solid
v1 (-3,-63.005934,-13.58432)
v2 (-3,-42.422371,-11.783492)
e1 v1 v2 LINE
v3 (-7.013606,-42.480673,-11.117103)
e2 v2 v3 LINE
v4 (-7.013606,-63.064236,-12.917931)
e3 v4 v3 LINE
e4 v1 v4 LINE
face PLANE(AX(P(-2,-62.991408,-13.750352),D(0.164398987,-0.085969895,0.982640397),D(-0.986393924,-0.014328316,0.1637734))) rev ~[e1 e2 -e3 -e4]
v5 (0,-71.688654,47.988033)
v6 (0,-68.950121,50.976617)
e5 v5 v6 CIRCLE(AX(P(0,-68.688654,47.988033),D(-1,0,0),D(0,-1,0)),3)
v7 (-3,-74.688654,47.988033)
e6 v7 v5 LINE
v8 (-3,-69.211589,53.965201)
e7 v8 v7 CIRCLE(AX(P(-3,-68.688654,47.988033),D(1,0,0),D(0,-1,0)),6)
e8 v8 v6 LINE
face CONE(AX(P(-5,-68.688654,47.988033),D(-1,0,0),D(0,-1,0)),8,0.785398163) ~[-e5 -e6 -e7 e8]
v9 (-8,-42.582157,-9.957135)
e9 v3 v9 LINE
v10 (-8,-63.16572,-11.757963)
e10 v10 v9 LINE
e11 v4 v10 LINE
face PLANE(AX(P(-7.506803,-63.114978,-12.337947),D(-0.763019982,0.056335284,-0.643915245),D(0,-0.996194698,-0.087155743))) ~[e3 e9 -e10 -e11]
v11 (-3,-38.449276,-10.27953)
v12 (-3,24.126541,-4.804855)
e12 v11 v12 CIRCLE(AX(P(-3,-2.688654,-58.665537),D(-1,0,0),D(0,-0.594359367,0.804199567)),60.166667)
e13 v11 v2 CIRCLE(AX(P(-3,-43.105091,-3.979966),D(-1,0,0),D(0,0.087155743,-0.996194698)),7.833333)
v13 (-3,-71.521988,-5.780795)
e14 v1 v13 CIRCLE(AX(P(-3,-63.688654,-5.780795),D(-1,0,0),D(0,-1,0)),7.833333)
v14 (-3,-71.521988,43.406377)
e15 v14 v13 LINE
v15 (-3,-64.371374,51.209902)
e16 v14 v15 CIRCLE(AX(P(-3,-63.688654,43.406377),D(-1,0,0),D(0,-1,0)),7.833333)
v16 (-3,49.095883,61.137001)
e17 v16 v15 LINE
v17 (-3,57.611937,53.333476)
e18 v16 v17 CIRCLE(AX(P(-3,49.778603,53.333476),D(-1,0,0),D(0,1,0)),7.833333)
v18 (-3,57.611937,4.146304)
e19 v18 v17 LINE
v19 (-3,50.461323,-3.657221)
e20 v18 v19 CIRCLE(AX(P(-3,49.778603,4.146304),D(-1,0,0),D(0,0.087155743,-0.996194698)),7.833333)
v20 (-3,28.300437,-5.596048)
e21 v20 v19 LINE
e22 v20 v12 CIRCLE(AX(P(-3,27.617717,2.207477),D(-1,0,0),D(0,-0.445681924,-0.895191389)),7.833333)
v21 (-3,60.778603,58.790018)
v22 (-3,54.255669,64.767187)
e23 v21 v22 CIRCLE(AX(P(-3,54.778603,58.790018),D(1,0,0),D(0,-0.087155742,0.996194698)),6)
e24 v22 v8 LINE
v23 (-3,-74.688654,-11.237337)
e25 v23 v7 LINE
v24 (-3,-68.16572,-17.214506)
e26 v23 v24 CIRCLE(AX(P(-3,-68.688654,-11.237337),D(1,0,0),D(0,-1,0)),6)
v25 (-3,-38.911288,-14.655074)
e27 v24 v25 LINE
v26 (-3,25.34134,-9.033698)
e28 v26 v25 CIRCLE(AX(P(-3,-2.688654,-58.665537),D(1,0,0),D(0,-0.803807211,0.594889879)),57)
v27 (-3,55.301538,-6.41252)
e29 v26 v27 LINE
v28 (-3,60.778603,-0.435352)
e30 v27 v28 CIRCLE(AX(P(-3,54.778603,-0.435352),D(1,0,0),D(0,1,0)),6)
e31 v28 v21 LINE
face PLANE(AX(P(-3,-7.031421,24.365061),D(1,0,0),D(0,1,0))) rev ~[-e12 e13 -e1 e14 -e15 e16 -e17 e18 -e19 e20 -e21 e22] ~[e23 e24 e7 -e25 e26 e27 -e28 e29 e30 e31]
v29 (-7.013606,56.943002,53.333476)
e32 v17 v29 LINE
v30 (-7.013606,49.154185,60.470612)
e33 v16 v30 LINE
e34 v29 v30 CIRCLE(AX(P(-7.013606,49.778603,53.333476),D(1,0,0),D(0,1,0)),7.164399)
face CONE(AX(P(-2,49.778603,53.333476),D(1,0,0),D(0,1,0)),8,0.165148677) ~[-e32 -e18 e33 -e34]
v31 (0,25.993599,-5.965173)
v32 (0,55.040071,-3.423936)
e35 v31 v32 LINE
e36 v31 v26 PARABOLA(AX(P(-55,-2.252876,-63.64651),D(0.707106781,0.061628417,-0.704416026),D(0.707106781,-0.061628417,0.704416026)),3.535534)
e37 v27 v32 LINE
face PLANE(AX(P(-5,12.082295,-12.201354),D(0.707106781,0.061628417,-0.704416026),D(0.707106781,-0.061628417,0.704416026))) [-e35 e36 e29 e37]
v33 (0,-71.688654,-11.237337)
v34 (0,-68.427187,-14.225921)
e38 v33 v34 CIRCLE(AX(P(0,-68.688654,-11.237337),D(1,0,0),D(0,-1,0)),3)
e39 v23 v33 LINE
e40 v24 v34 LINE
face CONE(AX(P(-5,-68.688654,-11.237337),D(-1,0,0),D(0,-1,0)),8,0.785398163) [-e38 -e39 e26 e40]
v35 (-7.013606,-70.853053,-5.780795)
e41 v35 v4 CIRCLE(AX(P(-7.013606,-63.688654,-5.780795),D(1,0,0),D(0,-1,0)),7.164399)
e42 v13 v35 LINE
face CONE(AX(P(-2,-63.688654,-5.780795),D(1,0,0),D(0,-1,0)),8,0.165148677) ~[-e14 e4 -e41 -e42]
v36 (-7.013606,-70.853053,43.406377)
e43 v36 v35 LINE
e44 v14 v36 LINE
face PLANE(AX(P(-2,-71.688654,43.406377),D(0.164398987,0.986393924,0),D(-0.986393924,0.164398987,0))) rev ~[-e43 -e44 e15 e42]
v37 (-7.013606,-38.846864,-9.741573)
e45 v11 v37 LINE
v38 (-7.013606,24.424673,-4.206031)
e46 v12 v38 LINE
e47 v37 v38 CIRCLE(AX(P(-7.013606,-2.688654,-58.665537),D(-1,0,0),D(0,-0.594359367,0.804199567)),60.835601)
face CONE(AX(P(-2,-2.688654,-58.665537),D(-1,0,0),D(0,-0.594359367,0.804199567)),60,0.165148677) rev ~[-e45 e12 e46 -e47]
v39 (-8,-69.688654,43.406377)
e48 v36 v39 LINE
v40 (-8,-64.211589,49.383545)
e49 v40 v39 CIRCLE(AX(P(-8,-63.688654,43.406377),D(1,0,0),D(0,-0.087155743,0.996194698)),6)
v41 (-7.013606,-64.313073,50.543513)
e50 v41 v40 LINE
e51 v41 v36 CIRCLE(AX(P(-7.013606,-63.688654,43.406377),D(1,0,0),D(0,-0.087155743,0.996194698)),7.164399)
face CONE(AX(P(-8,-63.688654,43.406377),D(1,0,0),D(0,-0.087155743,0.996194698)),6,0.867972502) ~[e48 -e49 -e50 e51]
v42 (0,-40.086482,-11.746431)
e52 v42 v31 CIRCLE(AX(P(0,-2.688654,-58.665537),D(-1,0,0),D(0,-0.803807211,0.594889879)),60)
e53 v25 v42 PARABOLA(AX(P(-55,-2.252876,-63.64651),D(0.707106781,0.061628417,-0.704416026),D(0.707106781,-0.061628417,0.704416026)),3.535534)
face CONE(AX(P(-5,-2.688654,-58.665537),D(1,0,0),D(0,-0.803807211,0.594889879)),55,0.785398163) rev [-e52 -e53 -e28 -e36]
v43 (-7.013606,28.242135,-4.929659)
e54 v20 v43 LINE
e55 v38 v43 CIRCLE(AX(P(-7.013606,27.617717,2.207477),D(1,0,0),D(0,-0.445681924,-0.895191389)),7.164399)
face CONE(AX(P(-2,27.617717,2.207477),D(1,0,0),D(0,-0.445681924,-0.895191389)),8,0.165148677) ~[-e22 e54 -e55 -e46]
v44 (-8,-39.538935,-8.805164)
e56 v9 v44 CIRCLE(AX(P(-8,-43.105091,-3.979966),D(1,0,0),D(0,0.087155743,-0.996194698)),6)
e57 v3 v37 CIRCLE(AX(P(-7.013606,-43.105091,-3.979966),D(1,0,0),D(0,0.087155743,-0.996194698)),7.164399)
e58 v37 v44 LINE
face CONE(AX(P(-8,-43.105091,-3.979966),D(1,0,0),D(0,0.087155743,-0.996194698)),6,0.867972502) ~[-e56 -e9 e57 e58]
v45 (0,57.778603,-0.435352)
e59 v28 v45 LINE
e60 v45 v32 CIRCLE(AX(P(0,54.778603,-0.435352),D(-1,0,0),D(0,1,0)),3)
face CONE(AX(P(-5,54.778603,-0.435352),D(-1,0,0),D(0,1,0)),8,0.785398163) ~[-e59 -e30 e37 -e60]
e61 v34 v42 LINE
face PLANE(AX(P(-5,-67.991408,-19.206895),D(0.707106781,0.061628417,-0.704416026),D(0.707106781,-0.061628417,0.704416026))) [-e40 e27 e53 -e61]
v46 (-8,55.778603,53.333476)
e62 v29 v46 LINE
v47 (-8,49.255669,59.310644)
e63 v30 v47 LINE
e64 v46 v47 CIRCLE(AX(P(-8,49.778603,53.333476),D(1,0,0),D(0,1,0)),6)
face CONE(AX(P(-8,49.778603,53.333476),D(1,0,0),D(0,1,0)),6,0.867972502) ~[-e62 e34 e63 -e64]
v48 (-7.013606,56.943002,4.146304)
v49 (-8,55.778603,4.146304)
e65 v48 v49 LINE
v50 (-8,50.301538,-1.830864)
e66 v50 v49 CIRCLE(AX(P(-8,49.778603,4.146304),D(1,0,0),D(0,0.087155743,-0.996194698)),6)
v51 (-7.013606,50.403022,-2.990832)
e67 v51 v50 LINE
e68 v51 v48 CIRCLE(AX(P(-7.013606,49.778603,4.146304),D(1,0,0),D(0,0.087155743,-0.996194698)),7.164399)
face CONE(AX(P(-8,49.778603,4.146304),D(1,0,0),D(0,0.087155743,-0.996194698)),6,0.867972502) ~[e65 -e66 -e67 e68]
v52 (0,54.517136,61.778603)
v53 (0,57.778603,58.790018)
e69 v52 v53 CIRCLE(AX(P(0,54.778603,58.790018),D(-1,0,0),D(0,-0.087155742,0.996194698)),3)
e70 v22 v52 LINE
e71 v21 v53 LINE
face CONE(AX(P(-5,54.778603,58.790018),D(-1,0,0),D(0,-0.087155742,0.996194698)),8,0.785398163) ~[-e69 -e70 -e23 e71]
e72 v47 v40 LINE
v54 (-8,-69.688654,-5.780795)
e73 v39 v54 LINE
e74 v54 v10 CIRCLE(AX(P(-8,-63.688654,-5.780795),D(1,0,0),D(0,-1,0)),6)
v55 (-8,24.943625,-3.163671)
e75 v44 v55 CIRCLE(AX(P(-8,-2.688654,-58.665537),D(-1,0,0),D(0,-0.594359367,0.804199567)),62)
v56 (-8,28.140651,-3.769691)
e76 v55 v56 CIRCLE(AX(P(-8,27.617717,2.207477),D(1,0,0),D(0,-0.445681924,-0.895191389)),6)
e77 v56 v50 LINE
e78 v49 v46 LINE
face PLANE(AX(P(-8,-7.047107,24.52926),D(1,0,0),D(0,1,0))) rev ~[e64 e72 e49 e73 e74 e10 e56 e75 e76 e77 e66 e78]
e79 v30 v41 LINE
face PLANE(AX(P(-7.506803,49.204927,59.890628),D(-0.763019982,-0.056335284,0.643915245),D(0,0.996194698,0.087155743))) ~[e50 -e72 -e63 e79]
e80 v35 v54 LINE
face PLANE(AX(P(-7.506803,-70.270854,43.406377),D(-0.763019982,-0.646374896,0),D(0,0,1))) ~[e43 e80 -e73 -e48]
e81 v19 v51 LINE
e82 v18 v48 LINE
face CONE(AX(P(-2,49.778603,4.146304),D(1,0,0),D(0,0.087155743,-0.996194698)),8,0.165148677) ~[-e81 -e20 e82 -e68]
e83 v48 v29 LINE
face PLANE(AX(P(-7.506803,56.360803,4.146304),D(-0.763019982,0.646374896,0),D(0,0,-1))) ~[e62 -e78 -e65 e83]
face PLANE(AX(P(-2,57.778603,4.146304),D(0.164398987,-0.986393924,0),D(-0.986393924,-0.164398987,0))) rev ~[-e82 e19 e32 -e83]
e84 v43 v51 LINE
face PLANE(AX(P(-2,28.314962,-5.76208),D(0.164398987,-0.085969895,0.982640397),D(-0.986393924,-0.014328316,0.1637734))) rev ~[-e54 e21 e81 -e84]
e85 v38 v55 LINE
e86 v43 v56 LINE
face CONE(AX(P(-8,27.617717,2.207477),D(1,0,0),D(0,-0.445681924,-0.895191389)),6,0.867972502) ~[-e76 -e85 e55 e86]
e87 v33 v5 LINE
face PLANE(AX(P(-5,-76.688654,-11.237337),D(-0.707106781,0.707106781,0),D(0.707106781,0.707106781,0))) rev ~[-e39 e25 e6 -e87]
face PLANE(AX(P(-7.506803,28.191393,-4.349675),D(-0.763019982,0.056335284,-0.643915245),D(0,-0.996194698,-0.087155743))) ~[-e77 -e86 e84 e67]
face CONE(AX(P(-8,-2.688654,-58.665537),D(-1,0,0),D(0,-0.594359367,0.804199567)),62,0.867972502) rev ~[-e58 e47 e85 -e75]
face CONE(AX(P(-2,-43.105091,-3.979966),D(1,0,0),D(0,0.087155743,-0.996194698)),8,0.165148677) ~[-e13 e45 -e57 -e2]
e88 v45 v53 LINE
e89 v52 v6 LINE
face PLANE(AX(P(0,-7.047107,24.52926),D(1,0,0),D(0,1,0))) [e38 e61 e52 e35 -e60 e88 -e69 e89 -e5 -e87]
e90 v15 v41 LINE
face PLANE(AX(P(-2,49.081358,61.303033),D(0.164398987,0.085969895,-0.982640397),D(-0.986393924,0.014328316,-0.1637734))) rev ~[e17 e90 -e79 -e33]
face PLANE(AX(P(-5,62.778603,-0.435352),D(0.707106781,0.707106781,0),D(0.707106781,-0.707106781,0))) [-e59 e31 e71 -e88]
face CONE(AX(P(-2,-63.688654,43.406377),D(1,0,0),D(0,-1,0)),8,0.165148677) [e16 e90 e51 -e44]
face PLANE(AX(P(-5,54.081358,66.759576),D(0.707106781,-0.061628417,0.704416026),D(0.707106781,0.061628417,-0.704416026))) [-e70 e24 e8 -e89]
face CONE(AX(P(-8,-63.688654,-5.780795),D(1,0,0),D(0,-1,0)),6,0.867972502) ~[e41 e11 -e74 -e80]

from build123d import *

# Parameters (mm, degrees)
F1_DEPTH     = 3
F2_DEPTH     = 8
F3_R         = 8
F4_T4_DEPTH  = 113.9006842239
F4_T9_ANGLE  = 95
F4_T14_ANGLE = 85
F4_T19_DEPTH = 49.1871720396
F4_T24_ANGLE = 95
F4_T29_DEPTH = 20.662188907
F4_T34_ANGLE = 31.4669762933
F4_T39_ANGLE = 62.9339525865
F4_T44_ANGLE = 31.4669762933
F4_T49_DEPTH = 22.2455379196
F4_T54_ANGLE = 85
F4_T59_DEPTH = 49.1871720396
F5_SIZE      = 1
F6_T1_DEPTH  = 123.9388825993
F6_T3_DEPTH  = 59.2253704151
F6_T5_DEPTH  = 42.8508484491
F6_T7_DEPTH  = 59.2253704151
F6_T9_DEPTH  = 43.5593108265
F6_T12_ANGLE = 96.9904356043
F6_T14_ANGLE = 95
F6_T16_ANGLE = 85
F6_T18_ANGLE = 95
F6_T20_ANGLE = 85


# Not quite as in the source:
# - a fillet or chamfer that OpenCascade refuses, or shapes differently, is made with other operations: its cross-section is extruded or revolved along the edge and cut away or added


with BuildPart() as f1:
    # F0 (on Right) → F1 (new body)
    with BuildSketch(Plane.YZ):
        with BuildLine():
            Line((-76.6886542646, 55.3186824411), (-76.6886542646, -19.9678053747))
            Line((-76.6886542646, -19.9678053747), (-38.1131050777, -16.5928821315))
            ThreePointArc((-38.1131050777, -16.5928821315), (-7.4822201157, -3.8748285682), (24.8917797013, -11.0806689666))
            Line((24.8917797013, -11.0806689666), (62.7786034683, -7.76600139))
            Line((62.7786034683, -7.76600139), (62.7786034683, 67.5204864257))
            Line((62.7786034683, 67.5204864257), (-76.6886542646, 55.3186824411))
        make_face()
        with BuildLine():
            Line((-40.0864817191, -11.7464310288), (-71.6886542646, -14.5112628693))
            Line((-71.6886542646, -14.5112628693), (-71.6886542646, 50.737026571))
            Line((-71.6886542646, 50.737026571), (57.7786034683, 62.0639439204))
            Line((57.7786034683, 62.0639439204), (57.7786034683, -3.1843455199))
            Line((57.7786034683, -3.1843455199), (25.9935989152, -5.9651730884))
            ThreePointArc((25.9935989152, -5.9651730884), (-7.9179988294, 1.1061449223), (-40.0864817191, -11.7464310288))
        make_face(mode=Mode.SUBTRACT)
        with BuildLine():
            Line((-71.6886542646, 50.737026571), (-71.6886542646, -14.5112628693))
            Line((-71.6886542646, -14.5112628693), (-40.0864817191, -11.7464310288))
            ThreePointArc((-40.0864817191, -11.7464310288), (-7.9179988294, 1.1061449223), (25.9935989152, -5.9651730884))
            Line((25.9935989152, -5.9651730884), (57.7786034683, -3.1843455199))
            Line((57.7786034683, -3.1843455199), (57.7786034683, 62.0639439204))
            Line((57.7786034683, 62.0639439204), (-71.6886542646, 50.737026571))
        make_face()
    extrude(amount=-F1_DEPTH)

    # F0 (on Right) → F2 (join)
    with BuildSketch(Plane.YZ):
        with BuildLine():
            Line((-71.6886542646, 50.737026571), (-71.6886542646, -14.5112628693))
            Line((-71.6886542646, -14.5112628693), (-40.0864817191, -11.7464310288))
            ThreePointArc((-40.0864817191, -11.7464310288), (-7.9179988294, 1.1061449223), (25.9935989152, -5.9651730884))
            Line((25.9935989152, -5.9651730884), (57.7786034683, -3.1843455199))
            Line((57.7786034683, -3.1843455199), (57.7786034683, 62.0639439204))
            Line((57.7786034683, 62.0639439204), (-71.6886542646, 50.737026571))
        make_face()
    extrude(amount=-F2_DEPTH)

    # F3
    f3_edges = [f1.edges().sort_by_distance(p)[0] for p in [
        (-5.5, 57.778603, 62.063944),
        (-5.5, -71.688654, 50.737027),
        (-5.5, -71.688654, -14.511263),
        (-5.5, -40.086482, -11.746431),
        (-5.5, 25.993599, -5.965173),
        (-5.5, 57.778603, -3.184346),
        (-1.5, -76.688654, 55.318682),
        (-1.5, -76.688654, -19.967805),
        (-1.5, 62.778603, -7.766001),
        (-1.5, 62.778603, 67.520486),
    ]]
    fillet(f3_edges, radius=F3_R)

    # F4: chamfer of 1 x 6 on 1 edges, made by hand


with BuildPart() as f4_tool2:
    # F4_s3 → F4_t4 (new body)
    with BuildSketch(Plane(origin=(0, 54.0311094993, 4.7271095589), x_dir=(1, 0, 0), z_dir=(0, -0.9961946981, -0.0871557427))):
        Polygon((-2, 56.792034776), (-8, 55.792034776), (-8, 56.792034776), align=None)
    extrude(amount=F4_T4_DEPTH)

    split(bisect_by=Plane.YZ.offset(-3), keep=Keep.BOTTOM)


with BuildPart() as f1_1:
    add(f1.part)

    # F4_t1: cut F4_tool2
    add(f4_tool2.part, mode=Mode.SUBTRACT)


with BuildPart() as f4_tool7:
    # F4_s8 → F4_t9 (revolve)
    with BuildSketch(Plane.XY.offset(53.3334759118)):
        Polygon((-2, 57.7786034683), (-8, 56.7786034683), (-8, 57.7786034683), align=None)
    revolve(axis=Axis((-8, 49.7786034683, 53.3334759118), (1, 0, 0)), revolution_arc=F4_T9_ANGLE)

    split(bisect_by=Plane.YZ.offset(-3), keep=Keep.BOTTOM)


with BuildPart() as f1_2:
    add(f1_1.part)

    # F4_t6: cut F4_tool7
    add(f4_tool7.part, mode=Mode.SUBTRACT)


with BuildPart() as f4_tool12:
    # F4_s13 → F4_t14 (revolve)
    with BuildSketch(Plane.XY.offset(43.4063771788)):
        Polygon((-2, -71.6886542646), (-8, -70.6886542646), (-8, -71.6886542646), align=None)
    revolve(axis=Axis((-8, -63.6886542646, 43.4063771788), (-1, 0, 0)), revolution_arc=F4_T14_ANGLE)

    split(bisect_by=Plane.YZ.offset(-3), keep=Keep.BOTTOM)


with BuildPart() as f1_3:
    add(f1_2.part)

    # F4_t11: cut F4_tool12
    add(f4_tool12.part, mode=Mode.SUBTRACT)


with BuildPart() as f4_tool17:
    # F4_s18 → F4_t19 (new body)
    with BuildSketch(Plane.XY.offset(43.4063771788)):
        Polygon((-2, -71.6886542646), (-8, -70.6886542646), (-8, -71.6886542646), align=None)
    extrude(amount=-F4_T19_DEPTH)

    split(bisect_by=Plane.YZ.offset(-3), keep=Keep.BOTTOM)


with BuildPart() as f1_4:
    add(f1_3.part)

    # F4_t16: cut F4_tool17
    add(f4_tool17.part, mode=Mode.SUBTRACT)


with BuildPart() as f4_tool22:
    # F4_s23 → F4_t24 (revolve)
    with BuildSketch(Plane.XY.offset(-5.7807948608)):
        Polygon((-2, -71.6886542646), (-8, -70.6886542646), (-8, -71.6886542646), align=None)
    revolve(axis=Axis((-8, -63.6886542646, -5.7807948608), (1, 0, 0)), revolution_arc=F4_T24_ANGLE)

    split(bisect_by=Plane.YZ.offset(-3), keep=Keep.BOTTOM)


with BuildPart() as f1_5:
    add(f1_4.part)

    # F4_t21: cut F4_tool22
    add(f4_tool22.part, mode=Mode.SUBTRACT)


with BuildPart() as f4_tool27:
    # F4_s28 → F4_t29 (new body)
    with BuildSketch(Plane(origin=(0, -63.7067796281, -5.5736210072), x_dir=(1, 0, 0), z_dir=(0, 0.9961946981, 0.0871557427))):
        Polygon((-2, 8.207965224), (-8, 7.207965224), (-8, 8.207965224), align=None)
    extrude(amount=F4_T29_DEPTH)

    split(bisect_by=Plane.YZ.offset(-3), keep=Keep.BOTTOM)


with BuildPart() as f1_6:
    add(f1_5.part)

    # F4_t26: cut F4_tool27
    add(f4_tool27.part, mode=Mode.SUBTRACT)


with BuildPart() as f4_tool32:
    # F4_s33 → F4_t34 (revolve)
    with BuildSketch(Plane(origin=(0, -43.123216588, -3.7727925862), x_dir=(1, 0, 0), z_dir=(0, -0.9961946981, -0.0871557427))):
        Polygon((-2, -8.207965224), (-8, -7.207965224), (-8, -8.207965224), align=None)
    revolve(axis=Axis((-8, -43.1050912244, -3.9799664398), (1, 0, 0)), revolution_arc=F4_T34_ANGLE)

    split(bisect_by=Plane.YZ.offset(-3), keep=Keep.BOTTOM)


with BuildPart() as f1_7:
    add(f1_6.part)

    # F4_t31: cut F4_tool32
    add(f4_tool32.part, mode=Mode.SUBTRACT)


with BuildPart() as f4_tool37:
    # F4_s38 → F4_t39 (revolve)
    with BuildSketch(Plane(origin=(0, -29.7800133865, -22.0094994379), x_dir=(1, 0, 0), z_dir=(0, -0.8041995665, -0.5943593671))):
        Polygon((-2, 14.4192274514), (-8, 15.4192274514), (-8, 14.4192274514), align=None)
    revolve(axis=Axis((-8, -2.6886542646, -58.6655369632), (-1, 0, 0)), revolution_arc=F4_T39_ANGLE)

    split(bisect_by=Plane.YZ.offset(-3), keep=Keep.BOTTOM)


with BuildPart() as f1_8:
    add(f1_7.part)

    # F4_t36: cut F4_tool37
    add(f4_tool37.part, mode=Mode.SUBTRACT)


with BuildPart() as f4_tool42:
    # F4_s43 → F4_t44 (revolve)
    with BuildSketch(Plane(origin=(0, 21.2512251902, -10.5801809941), x_dir=(1, 0, 0), z_dir=(0, -0.895191389, 0.4456819235))):
        Polygon((-2, 6.2848318723), (-8, 7.2848318723), (-8, 6.2848318723), align=None)
    revolve(axis=Axis((-8, 27.6177165365, 2.207477492), (1, 0, 0)), revolution_arc=F4_T44_ANGLE)

    split(bisect_by=Plane.YZ.offset(-3), keep=Keep.BOTTOM)


with BuildPart() as f1_9:
    add(f1_8.part)

    # F4_t41: cut F4_tool42
    add(f4_tool42.part, mode=Mode.SUBTRACT)


with BuildPart() as f4_tool47:
    # F4_s48 → F4_t49 (new body)
    with BuildSketch(Plane(origin=(0, 27.599591173, 2.4146513456), x_dir=(1, 0, 0), z_dir=(0, 0.9961946981, 0.0871557427))):
        Polygon((-2, 8.207965224), (-8, 7.207965224), (-8, 8.207965224), align=None)
    extrude(amount=F4_T49_DEPTH)

    split(bisect_by=Plane.YZ.offset(-3), keep=Keep.BOTTOM)


with BuildPart() as f1_10:
    add(f1_9.part)

    # F4_t46: cut F4_tool47
    add(f4_tool47.part, mode=Mode.SUBTRACT)


with BuildPart() as f4_tool52:
    # F4_s53 → F4_t54 (revolve)
    with BuildSketch(Plane(origin=(0, 49.7604781047, 4.3534777258), x_dir=(1, 0, 0), z_dir=(0, -0.9961946981, -0.0871557427))):
        Polygon((-2, -8.207965224), (-8, -7.207965224), (-8, -8.207965224), align=None)
    revolve(axis=Axis((-8, 49.7786034683, 4.1463038722), (1, 0, 0)), revolution_arc=F4_T54_ANGLE)

    split(bisect_by=Plane.YZ.offset(-3), keep=Keep.BOTTOM)


with BuildPart() as f1_11:
    add(f1_10.part)

    # F4_t51: cut F4_tool52
    add(f4_tool52.part, mode=Mode.SUBTRACT)


with BuildPart() as f4_tool57:
    # F4_s58 → F4_t59 (new body)
    with BuildSketch(Plane.XY.offset(4.1463038722)):
        Polygon((-2, 57.7786034683), (-8, 56.7786034683), (-8, 57.7786034683), align=None)
    extrude(amount=F4_T59_DEPTH)

    split(bisect_by=Plane.YZ.offset(-3), keep=Keep.BOTTOM)


with BuildPart() as f1_12:
    add(f1_11.part)

    # F4_t56: cut F4_tool57
    add(f4_tool57.part, mode=Mode.SUBTRACT)

    # F5
    f5_edges = [f1_12.edges().sort_by_distance(p)[0] for p in [
        (-8, -7.565116, 55.343289),
        (-8, -68.849596, 48.135509),
        (-8, 54.507735, 58.494417),
        (-8, 54.939545, -0.582828),
        (-8, 39.30825, -3.796472),
        (-8, 26.31403, -4.670051),
        (-8, -8.005155, 2.10234),
        (-8, -40.626941, -10.526627),
        (-8, -52.786783, -11.853744),
        (-8, -68.417786, -10.941736),
        (-8, -70.688654, 18.812791),
        (-8, 56.778603, 28.73989),
    ]]
    chamfer(f5_edges, length=F5_SIZE)

    # F6: chamfer of 5 on 2 edges, made by hand

    # F6_s2 → F6_t1 (cut)
    with BuildSketch(Plane(origin=(0, 59.4668882131, 5.2026785738), x_dir=(1, 0, 0), z_dir=(0, -0.9961946981, -0.0871557427))):
        Polygon((-5, 61.792034776), (0, 56.792034776), (0, 61.792034776), align=None)
    extrude(amount=F6_T1_DEPTH, mode=Mode.SUBTRACT)

    # F6_s4 → F6_t3 (cut)
    with BuildSketch(Plane.XY.offset(-11.2373373661)):
        Polygon((-5, -76.6886542646), (0, -71.6886542646), (0, -76.6886542646), align=None)
    extrude(amount=F6_T3_DEPTH, mode=Mode.SUBTRACT)

    # F6_s6 → F6_t5 (cut)
    with BuildSketch(Plane(origin=(0, -69.1425583419, -6.0491900221), x_dir=(1, 0, 0), z_dir=(0, 0.9961946981, 0.0871557427))):
        Polygon((-5, 13.207965224), (0, 8.207965224), (0, 13.207965224), align=None)
    extrude(amount=F6_T5_DEPTH, mode=Mode.SUBTRACT)

    # F6_s8 → F6_t7 (cut)
    with BuildSketch(Plane.XY.offset(-0.4353519979)):
        Polygon((-5, 62.7786034683), (0, 57.7786034683), (0, 62.7786034683), align=None)
    extrude(amount=F6_T7_DEPTH, mode=Mode.SUBTRACT)

    # F6_s10 → F6_t9 (cut)
    with BuildSketch(Plane(origin=(0, 10.9311448931, 0.9563512575), x_dir=(1, 0, 0), z_dir=(0, 0.9961946981, 0.0871557427))):
        Polygon((-5, 13.207965224), (0, 8.207965224), (0, 13.207965224), align=None)
    extrude(amount=F6_T9_DEPTH, mode=Mode.SUBTRACT)

    # F6_s11 → F6_t12 (revolve, cut)
    with BuildSketch(Plane(origin=(0, -29.0039957446, -39.1898093404), x_dir=(1, 0, 0), z_dir=(0, -0.5948898787, -0.8038072109))):
        Polygon((-5, 22.2616255192), (0, 27.2616255192), (0, 22.2616255192), align=None)
    revolve(axis=Axis((0, -2.6886542646, -58.6655369632), (-1, 0, 0)), revolution_arc=F6_T12_ANGLE, mode=Mode.SUBTRACT)

    # F6_s13 → F6_t14 (revolve, cut)
    with BuildSketch(Plane(origin=(0, 59.4668882131, 5.2026785738), x_dir=(1, 0, 0), z_dir=(0, -0.9961946981, -0.0871557427))):
        Polygon((-5, 61.792034776), (0, 56.792034776), (0, 61.792034776), align=None)
    revolve(axis=Axis((0, 54.7786034683, 58.7900184172), (-1, 0, 0)), revolution_arc=F6_T14_ANGLE, mode=Mode.SUBTRACT)

    # F6_s15 → F6_t16 (revolve, cut)
    with BuildSketch(Plane.XY.offset(47.9880330489)):
        Polygon((-5, -76.6886542646), (0, -71.6886542646), (0, -76.6886542646), align=None)
    revolve(axis=Axis((0, -68.6886542646, 47.9880330489), (-1, 0, 0)), revolution_arc=F6_T16_ANGLE, mode=Mode.SUBTRACT)

    # F6_s17 → F6_t18 (revolve, cut)
    with BuildSketch(Plane.XY.offset(-11.2373373661)):
        Polygon((-5, -76.6886542646), (0, -71.6886542646), (0, -76.6886542646), align=None)
    revolve(axis=Axis((0, -68.6886542646, -11.2373373661), (1, 0, 0)), revolution_arc=F6_T18_ANGLE, mode=Mode.SUBTRACT)

    # F6_s19 → F6_t20 (revolve, cut)
    with BuildSketch(Plane.XY.offset(-0.4353519979)):
        Polygon((-5, 62.7786034683), (0, 57.7786034683), (0, 62.7786034683), align=None)
    revolve(axis=Axis((0, 54.7786034683, -0.4353519979), (-1, 0, 0)), revolution_arc=F6_T20_ANGLE, mode=Mode.SUBTRACT)


solid = f1_12.part
